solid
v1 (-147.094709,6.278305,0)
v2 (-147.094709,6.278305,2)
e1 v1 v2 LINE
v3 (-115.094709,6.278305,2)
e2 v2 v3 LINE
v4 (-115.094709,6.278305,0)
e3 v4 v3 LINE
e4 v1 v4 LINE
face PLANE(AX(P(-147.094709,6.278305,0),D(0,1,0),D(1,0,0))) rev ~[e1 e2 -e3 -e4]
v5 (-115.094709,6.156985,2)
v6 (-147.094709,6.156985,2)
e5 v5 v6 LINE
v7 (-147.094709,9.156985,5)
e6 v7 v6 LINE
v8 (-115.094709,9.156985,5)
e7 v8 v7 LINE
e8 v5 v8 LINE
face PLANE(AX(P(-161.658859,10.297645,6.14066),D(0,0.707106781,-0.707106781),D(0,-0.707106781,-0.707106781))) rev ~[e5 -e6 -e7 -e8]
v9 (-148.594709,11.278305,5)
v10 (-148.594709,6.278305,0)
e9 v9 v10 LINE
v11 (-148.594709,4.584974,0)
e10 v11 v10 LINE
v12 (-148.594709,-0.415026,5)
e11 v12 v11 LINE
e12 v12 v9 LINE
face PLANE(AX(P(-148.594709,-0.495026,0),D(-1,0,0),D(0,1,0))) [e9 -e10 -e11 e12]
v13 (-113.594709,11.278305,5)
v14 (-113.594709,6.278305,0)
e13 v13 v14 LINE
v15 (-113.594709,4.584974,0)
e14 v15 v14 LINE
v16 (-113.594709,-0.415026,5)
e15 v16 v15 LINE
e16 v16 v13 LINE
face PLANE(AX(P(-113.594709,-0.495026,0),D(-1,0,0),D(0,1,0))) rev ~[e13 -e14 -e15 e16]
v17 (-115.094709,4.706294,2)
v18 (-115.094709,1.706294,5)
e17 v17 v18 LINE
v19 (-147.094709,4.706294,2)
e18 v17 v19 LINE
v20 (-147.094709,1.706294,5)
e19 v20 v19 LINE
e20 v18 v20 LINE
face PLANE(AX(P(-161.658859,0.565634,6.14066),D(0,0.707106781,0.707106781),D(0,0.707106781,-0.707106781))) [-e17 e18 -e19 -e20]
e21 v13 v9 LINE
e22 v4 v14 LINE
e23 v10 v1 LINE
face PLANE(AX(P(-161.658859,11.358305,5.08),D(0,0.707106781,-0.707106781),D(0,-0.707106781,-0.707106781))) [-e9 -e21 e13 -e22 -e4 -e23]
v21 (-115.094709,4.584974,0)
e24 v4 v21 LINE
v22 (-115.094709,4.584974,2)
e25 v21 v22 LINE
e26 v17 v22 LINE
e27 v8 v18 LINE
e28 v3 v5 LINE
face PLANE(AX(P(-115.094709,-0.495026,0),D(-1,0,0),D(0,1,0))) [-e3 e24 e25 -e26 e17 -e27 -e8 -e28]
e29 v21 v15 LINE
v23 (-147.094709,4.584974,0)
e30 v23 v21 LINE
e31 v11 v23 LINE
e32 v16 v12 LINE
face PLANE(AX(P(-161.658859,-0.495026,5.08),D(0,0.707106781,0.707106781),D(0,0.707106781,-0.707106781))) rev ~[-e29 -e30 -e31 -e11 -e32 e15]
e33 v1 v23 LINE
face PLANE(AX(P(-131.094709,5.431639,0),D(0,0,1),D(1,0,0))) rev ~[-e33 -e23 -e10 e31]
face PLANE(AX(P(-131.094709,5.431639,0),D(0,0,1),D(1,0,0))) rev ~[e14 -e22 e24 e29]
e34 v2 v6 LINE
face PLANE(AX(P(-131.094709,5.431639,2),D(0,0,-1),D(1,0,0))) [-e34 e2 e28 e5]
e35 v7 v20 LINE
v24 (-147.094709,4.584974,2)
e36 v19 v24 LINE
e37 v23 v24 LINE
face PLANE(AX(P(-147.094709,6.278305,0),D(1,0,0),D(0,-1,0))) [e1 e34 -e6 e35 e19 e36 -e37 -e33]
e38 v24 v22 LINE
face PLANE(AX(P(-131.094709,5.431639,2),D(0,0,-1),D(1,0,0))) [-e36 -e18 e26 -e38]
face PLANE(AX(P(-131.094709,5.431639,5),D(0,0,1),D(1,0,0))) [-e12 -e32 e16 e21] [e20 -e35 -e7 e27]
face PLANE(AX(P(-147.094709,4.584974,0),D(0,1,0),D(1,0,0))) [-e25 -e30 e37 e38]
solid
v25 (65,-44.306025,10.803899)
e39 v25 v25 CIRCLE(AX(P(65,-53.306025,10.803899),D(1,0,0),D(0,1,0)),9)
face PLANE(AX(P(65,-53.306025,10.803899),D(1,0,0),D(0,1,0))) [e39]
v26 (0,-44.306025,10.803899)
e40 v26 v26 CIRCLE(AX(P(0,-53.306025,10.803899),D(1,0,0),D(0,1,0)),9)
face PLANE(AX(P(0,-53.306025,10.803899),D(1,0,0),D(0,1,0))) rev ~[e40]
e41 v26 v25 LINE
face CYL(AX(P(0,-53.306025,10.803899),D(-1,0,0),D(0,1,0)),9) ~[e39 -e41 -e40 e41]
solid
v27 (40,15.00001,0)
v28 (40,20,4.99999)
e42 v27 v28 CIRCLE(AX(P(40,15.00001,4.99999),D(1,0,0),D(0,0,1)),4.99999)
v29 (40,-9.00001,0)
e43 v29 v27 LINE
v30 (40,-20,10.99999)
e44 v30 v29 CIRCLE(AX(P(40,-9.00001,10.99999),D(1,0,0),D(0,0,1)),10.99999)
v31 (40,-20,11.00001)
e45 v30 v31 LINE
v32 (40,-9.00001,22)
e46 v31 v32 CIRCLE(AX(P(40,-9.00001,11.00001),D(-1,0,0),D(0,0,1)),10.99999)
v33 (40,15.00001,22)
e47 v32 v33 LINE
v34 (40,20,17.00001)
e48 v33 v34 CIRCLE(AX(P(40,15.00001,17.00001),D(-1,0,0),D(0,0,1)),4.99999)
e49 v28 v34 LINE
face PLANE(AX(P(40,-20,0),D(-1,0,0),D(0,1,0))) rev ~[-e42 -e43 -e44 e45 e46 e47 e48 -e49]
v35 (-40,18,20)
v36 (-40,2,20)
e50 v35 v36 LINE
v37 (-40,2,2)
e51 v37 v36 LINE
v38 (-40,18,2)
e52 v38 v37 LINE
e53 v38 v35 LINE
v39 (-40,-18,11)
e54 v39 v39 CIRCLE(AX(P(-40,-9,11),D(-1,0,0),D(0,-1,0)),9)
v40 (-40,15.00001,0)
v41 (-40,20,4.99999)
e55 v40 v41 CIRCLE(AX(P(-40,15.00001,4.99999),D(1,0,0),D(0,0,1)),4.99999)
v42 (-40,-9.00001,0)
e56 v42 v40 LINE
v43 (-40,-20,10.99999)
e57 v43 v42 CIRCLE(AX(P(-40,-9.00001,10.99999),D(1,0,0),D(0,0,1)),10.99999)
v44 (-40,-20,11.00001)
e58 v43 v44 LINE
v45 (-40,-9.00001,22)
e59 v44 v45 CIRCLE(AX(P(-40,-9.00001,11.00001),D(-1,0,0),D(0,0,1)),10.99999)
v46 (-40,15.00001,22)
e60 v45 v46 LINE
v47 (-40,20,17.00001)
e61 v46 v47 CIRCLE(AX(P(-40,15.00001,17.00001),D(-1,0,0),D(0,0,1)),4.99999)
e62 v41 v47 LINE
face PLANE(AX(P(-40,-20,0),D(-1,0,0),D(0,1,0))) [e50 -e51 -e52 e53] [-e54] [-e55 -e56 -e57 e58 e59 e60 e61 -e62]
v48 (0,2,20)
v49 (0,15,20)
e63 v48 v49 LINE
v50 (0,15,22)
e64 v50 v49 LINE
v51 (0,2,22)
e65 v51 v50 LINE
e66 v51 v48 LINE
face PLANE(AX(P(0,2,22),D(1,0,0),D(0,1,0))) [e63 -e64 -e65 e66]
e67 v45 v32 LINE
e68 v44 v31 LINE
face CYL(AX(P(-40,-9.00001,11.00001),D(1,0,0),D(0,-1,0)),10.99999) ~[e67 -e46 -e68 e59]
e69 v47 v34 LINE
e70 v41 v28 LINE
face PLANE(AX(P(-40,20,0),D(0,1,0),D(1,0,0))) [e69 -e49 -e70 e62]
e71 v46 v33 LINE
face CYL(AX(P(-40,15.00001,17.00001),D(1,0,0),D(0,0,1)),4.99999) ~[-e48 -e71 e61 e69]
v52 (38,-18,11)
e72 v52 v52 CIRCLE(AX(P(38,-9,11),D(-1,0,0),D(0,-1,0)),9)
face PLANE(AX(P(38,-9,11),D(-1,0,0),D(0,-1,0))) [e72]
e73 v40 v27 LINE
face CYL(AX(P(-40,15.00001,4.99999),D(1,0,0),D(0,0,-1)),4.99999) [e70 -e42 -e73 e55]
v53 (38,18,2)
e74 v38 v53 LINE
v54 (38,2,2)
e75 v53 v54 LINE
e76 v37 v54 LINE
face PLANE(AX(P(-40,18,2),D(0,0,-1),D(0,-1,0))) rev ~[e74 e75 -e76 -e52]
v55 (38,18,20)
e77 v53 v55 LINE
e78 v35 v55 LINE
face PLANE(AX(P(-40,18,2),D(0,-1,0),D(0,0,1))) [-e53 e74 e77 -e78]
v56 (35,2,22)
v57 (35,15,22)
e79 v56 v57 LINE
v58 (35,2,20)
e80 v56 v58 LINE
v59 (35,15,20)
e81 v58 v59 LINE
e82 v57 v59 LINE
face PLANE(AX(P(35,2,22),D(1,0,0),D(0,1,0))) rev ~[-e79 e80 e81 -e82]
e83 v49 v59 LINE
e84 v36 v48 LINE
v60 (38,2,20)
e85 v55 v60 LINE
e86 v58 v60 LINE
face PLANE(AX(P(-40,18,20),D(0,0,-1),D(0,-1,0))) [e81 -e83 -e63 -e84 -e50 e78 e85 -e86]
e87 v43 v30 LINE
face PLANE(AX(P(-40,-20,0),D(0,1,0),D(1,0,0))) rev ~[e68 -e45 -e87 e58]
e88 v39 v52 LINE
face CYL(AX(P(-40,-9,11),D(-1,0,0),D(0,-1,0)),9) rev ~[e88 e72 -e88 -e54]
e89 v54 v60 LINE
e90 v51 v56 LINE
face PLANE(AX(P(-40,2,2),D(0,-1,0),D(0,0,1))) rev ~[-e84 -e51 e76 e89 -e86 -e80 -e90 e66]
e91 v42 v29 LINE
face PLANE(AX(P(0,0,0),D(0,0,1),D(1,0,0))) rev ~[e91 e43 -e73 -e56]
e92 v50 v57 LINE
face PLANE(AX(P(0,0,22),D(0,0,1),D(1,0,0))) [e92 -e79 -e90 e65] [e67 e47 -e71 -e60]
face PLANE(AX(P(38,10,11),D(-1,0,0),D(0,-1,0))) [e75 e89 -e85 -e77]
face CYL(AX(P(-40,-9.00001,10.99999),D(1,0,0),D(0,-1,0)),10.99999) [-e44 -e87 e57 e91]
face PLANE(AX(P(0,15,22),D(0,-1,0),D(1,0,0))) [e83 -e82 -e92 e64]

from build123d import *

# Parameters (mm, degrees)
F0_W        = 80
F0_H        = 40
F1_DEPTH    = 22
F2_R        = 10.99999
F3_W        = 35
F3_H        = 13
F4_DEPTH    = 2
F5_R        = 4.99999
F6_W        = 35
F6_H        = 11.8533317
F7_DEPTH    = 5
F8_T1_DEPTH = 61.1282991577
F9_T        = -1.5
F10_W       = 32
F10_H       = 1.6933317
F11_DEPTH   = 2
F12_R       = 9
F13_DEPTH   = 65
F14_R       = 9
F15_DEPTH   = 78
F16_W       = 16
F16_H       = 18
F17_DEPTH   = 78


# Not quite as in the source:
# - a fillet or chamfer that OpenCascade refuses, or shapes differently, is made with other operations: its cross-section is extruded or revolved along the edge and cut away or added
# - a fillet or chamfer is up to 0.001 mm smaller than in the source, because OpenCascade refuses the exact size


with BuildPart() as f1:
    # F0 (on Top) → F1 (new body)
    with BuildSketch(Plane.XY):
        Rectangle(F0_W, F0_H)
    extrude(amount=F1_DEPTH)

    # F2 (radius 11 in the source; OpenCascade refuses exactly that, so slightly less here)
    f2_edges = [f1.edges().sort_by_distance(p)[0] for p in [
        (0, -20, 22),
        (0, -20, 0),
    ]]
    fillet(f2_edges, radius=F2_R)

    # F3 (on face) → F4 (cut)
    with BuildSketch(Plane.XY.offset(22)):
        with Locations((17.5, 8.5)):
            Rectangle(F3_W, F3_H)
    extrude(amount=-F4_DEPTH, mode=Mode.SUBTRACT)

    # F5 (radius 5 in the source; OpenCascade refuses exactly that, so slightly less here)
    f5_edges = [f1.edges().sort_by_distance(p)[0] for p in [
        (0, 20, 22),
        (0, 20, 0),
    ]]
    fillet(f5_edges, radius=F5_R)

    # F14 (on face) → F15 (cut)
    with BuildSketch(Plane(origin=(-40, 0, 0), x_dir=(0, -1, 0), z_dir=(-1, 0, 0))):
        with Locations((9, 11)):
            Circle(F14_R)
    extrude(amount=-F15_DEPTH, mode=Mode.SUBTRACT)

    # F16 (on face) → F17 (cut)
    with BuildSketch(Plane(origin=(-40, 0, 0), x_dir=(0, -1, 0), z_dir=(-1, 0, 0))):
        with Locations((-10, 11)):
            Rectangle(F16_W, F16_H)
    extrude(amount=-F17_DEPTH, mode=Mode.SUBTRACT)


with BuildPart() as f7:
    # F6 (on Top) → F7 (new body)
    with BuildSketch(Plane.XY):
        with Locations((-131.0947090387, 5.4316394962)):
            Rectangle(F6_W, F6_H)
    extrude(amount=F7_DEPTH)

    # F8: chamfer of 5.08 on 2 edges, made by hand

    # F8_s2 → F8_t1 (cut)
    with BuildSketch(Plane.YZ.offset(-161.6588586176)):
        Polygon((-0.4950263537, 5.08), (4.5849736463, 0), (-0.4950263537, 0), align=None)
        Polygon((11.3583053462, 5.08), (6.2783053462, 0), (11.3583053462, 0), align=None)
    extrude(amount=F8_T1_DEPTH, mode=Mode.SUBTRACT)

    # F9
    f9_openings = [f7.faces().sort_by_distance(p)[0] for p in [
        (-131.094709, 5.431639, 5),
    ]]
    offset(amount=F9_T, openings=f9_openings, kind=Kind.INTERSECTION)

    # F10 (on face) → F11 (cut)
    with BuildSketch(Plane(origin=(0, 0, 0), x_dir=(1, 0, 0), z_dir=(0, 0, -1))):
        with Locations((-131.0947090387, -5.4316394962)):
            Rectangle(F10_W, F10_H)
    extrude(amount=-F11_DEPTH, mode=Mode.SUBTRACT)


with BuildPart() as f13:
    # F12 (on Right) → F13 (new body)
    with BuildSketch(Plane.YZ):
        with Locations((-53.3060245216, 10.8038987964)):
            Circle(F12_R)
    extrude(amount=F13_DEPTH)


solid = Compound([f1.part, f7.part, f13.part])
